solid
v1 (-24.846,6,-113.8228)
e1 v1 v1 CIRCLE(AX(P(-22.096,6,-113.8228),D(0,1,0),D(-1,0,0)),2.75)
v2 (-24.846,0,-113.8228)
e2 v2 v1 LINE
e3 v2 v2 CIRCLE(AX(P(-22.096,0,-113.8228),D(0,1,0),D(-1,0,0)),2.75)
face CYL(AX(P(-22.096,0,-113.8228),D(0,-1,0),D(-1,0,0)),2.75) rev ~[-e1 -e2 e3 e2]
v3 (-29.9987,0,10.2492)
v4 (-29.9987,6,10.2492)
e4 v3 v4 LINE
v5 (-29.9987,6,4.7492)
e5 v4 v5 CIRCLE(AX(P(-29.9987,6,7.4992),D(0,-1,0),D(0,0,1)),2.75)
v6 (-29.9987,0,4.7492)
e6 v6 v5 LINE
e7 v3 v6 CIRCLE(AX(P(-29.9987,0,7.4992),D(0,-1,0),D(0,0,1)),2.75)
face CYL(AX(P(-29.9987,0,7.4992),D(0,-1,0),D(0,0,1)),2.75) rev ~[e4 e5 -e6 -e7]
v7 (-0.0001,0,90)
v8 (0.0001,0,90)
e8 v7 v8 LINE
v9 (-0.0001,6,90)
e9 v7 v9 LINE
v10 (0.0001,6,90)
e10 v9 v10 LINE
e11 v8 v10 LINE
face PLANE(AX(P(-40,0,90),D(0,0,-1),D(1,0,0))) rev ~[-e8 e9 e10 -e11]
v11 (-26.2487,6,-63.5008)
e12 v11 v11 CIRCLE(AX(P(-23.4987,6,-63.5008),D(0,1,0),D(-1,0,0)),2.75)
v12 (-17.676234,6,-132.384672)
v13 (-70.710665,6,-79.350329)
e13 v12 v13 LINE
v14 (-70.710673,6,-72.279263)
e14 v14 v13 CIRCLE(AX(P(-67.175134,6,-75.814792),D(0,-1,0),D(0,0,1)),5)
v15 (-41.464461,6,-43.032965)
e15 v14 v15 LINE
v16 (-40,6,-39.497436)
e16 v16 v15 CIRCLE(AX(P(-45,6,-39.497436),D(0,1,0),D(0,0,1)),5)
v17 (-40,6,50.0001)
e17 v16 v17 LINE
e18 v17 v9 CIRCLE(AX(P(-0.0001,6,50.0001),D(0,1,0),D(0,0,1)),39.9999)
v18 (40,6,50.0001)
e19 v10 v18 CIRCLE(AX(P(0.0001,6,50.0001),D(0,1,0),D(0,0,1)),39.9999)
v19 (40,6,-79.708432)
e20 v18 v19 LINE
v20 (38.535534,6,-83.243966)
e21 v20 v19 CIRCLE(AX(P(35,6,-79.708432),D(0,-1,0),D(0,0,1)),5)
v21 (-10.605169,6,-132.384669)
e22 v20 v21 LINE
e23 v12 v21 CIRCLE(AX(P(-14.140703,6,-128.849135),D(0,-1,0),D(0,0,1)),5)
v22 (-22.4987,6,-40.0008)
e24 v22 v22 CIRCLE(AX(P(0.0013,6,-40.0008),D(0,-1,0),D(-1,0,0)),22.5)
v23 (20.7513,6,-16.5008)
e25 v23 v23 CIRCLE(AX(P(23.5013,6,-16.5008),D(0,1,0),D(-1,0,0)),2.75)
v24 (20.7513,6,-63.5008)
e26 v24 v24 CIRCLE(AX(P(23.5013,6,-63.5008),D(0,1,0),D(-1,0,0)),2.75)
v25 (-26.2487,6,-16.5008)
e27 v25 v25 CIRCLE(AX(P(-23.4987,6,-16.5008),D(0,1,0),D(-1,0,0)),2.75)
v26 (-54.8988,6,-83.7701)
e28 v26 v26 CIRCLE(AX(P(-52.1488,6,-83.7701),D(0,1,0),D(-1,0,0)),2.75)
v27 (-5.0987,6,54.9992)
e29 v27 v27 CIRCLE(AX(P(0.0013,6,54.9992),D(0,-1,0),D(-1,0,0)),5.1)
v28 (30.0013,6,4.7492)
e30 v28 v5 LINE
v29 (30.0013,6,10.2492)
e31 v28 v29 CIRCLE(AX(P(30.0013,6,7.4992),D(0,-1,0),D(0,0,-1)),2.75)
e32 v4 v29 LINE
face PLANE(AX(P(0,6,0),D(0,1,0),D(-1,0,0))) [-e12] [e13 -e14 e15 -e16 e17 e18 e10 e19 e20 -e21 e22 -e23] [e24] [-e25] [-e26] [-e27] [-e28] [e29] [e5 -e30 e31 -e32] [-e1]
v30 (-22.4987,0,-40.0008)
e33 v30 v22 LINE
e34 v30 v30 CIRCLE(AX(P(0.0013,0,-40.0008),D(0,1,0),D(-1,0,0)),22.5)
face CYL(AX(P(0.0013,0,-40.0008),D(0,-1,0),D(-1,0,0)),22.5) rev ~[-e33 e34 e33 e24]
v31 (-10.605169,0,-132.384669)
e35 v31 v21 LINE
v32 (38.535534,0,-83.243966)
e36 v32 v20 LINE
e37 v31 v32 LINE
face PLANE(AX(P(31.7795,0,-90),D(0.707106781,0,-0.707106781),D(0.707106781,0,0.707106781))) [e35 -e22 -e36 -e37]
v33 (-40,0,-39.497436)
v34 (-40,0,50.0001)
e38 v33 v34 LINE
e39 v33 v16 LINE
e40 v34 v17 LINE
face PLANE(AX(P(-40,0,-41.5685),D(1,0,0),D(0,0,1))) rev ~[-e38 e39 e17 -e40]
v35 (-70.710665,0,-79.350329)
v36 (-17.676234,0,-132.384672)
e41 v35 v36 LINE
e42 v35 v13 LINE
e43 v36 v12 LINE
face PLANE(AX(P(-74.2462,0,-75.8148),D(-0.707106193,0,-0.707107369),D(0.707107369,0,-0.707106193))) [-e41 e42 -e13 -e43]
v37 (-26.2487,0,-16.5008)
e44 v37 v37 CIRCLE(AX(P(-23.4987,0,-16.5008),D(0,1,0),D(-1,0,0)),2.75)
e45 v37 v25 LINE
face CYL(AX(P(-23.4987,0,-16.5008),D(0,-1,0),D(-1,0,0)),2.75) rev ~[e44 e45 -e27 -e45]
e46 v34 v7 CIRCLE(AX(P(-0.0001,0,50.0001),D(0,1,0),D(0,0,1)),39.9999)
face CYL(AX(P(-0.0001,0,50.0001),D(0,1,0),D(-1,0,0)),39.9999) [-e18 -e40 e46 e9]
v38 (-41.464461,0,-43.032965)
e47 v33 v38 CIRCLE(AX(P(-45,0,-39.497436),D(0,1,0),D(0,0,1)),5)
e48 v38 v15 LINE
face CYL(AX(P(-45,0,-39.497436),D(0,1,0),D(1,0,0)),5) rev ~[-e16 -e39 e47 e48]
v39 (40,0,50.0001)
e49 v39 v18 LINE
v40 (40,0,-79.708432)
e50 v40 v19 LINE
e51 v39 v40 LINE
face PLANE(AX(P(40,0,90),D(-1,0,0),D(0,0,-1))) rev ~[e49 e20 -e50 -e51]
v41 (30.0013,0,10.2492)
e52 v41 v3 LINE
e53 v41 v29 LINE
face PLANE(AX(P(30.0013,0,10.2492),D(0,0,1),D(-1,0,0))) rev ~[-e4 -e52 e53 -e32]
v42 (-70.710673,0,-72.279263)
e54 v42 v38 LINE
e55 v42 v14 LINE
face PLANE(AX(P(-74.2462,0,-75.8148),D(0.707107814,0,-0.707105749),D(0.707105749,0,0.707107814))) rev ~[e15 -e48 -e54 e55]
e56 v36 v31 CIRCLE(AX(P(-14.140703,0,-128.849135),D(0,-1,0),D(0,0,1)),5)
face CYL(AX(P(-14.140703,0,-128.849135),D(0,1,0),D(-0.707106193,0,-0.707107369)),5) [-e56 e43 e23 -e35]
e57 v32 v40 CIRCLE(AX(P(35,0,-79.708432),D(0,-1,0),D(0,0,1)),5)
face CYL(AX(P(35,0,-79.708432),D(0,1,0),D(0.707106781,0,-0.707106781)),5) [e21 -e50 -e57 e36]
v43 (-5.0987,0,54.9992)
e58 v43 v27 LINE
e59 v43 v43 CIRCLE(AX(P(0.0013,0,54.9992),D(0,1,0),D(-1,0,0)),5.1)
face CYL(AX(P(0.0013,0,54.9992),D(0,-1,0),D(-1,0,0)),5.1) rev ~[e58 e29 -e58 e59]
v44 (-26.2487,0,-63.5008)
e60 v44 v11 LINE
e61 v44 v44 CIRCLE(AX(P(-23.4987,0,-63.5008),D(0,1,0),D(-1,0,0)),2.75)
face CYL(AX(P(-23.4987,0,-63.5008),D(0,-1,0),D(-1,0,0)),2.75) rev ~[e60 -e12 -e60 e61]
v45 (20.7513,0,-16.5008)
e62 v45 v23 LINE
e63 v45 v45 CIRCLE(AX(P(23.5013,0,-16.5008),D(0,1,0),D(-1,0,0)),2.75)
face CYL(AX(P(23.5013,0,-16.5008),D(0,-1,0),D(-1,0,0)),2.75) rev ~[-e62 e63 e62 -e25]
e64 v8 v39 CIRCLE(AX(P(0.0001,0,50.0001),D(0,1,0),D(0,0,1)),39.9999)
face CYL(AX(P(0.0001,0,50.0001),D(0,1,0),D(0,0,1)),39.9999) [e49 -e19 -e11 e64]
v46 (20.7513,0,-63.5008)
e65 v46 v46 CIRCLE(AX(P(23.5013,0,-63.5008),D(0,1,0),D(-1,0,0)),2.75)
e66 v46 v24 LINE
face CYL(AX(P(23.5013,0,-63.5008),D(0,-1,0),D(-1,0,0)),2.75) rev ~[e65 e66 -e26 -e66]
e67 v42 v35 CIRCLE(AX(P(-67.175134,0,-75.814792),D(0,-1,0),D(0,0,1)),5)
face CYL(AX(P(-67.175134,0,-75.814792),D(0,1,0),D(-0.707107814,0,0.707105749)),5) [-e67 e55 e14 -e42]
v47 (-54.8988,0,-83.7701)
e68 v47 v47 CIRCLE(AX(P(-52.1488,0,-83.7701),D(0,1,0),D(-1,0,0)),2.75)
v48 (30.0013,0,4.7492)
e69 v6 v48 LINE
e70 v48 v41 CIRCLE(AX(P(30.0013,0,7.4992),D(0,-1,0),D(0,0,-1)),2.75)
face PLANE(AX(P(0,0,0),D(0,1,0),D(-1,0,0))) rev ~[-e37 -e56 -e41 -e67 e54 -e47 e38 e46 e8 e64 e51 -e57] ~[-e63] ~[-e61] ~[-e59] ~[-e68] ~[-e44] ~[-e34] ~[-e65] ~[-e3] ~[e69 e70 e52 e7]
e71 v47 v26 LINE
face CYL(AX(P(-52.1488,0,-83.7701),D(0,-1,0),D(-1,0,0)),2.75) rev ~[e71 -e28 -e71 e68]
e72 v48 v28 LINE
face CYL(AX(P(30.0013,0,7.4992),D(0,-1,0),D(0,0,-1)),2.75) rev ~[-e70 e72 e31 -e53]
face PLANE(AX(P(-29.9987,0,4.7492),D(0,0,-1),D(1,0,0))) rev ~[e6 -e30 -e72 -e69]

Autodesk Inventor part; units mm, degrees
ref_plane "YZ Plane" through (0, 0, 0) normal (1, 0, 0) x (0, 1, 0)
ref_plane "XZ Plane" through (0, 0, 0) normal (0, 1, 0) x (-1, 0, 0)
sketch "Sketch1" plane through (0, 0, 0) normal (0, 1, 0) x (-1, 0, 0)
  line L0 (40, 90) -> (-40, 90)
  line L1 (-40, 90) -> (-40, -81.7795)
  line L2 (40, -41.5685) -> (40, 90)
  line L3 (40, 90) -> (-40, -90) construction
  line L4 (-40, 90) -> (40, -90) construction
  circle A0 centre (-0.0013, 54.9992) radius 5.1
  line L5 (23.4987, -16.5008) -> (-23.5013, -16.5008) construction
  line L6 (-23.5013, -16.5008) -> (-23.5013, -63.5008) construction
  line L7 (-23.5013, -63.5008) -> (23.4987, -63.5008) construction
  line L8 (23.4987, -63.5008) -> (23.4987, -16.5008) construction
  line L9 (23.4987, -16.5008) -> (-23.5013, -63.5008) construction
  line L10 (-23.5013, -16.5008) -> (23.4987, -63.5008) construction
  circle A1 centre (23.4987, -16.5008) radius 2.75
  circle A2 centre (23.4987, -63.5008) radius 2.75
  circle A3 centre (-23.5013, -16.5008) radius 2.75
  circle A4 centre (-23.5013, -63.5008) radius 2.75
  line L11 (-0.0013, -90.0008) -> (-0.0013, -80) construction
  line L12 (19.9987, -11.0008) -> (-20.0013, -11.0008) construction
  line L13 (-20.0013, -11.0008) -> (-20.0013, -69.0008) construction
  line L14 (-20.0013, -69.0008) -> (19.9987, -69.0008) construction
  line L15 (19.9987, -69.0008) -> (19.9987, -11.0008) construction
  line L16 (19.9987, -11.0008) -> (-20.0013, -69.0008) construction
  line L17 (-20.0013, -11.0008) -> (19.9987, -69.0008) construction
  line L18 (-29.0013, -60.0008) -> (28.9987, -60.0008) construction
  line L19 (28.9987, -60.0008) -> (28.9987, -20.0008) construction
  line L20 (28.9987, -20.0008) -> (-29.0013, -20.0008) construction
  line L21 (-29.0013, -20.0008) -> (-29.0013, -60.0008)
  line L22 (-29.0013, -60.0008) -> (28.9987, -20.0008) construction
  line L23 (28.9987, -60.0008) -> (-29.0013, -20.0008) construction
  line L24 (-0.0013, 54.9992) -> (102.5291, -47.5313) construction
  line L25 (-0.0013, 54.9992) -> (144.9987, 54.9992) construction
  line L26 (28.2843, 83.2843) -> (-28.2843, 26.7157) construction
  line L27 (-28.2843, 26.7157) -> (74.2462, -75.8148) construction
  line L28 (74.2462, -75.8148) -> (130.8148, -19.2462) construction
  line L29 (130.8148, -19.2462) -> (28.2843, 83.2843) construction
  line L30 (28.2843, 83.2843) -> (74.2462, -75.8148) construction
  line L31 (-28.2843, 26.7157) -> (130.8148, -19.2462) construction
  line L32 (74.2462, -75.8148) -> (14.1407, -135.9202)
  line L33 (14.1407, -135.9202) -> (-0.0014, -121.7781)
  line L34 (-0.0014, -121.7781) -> (-31.7795, -90)
  line L35 (74.2462, -75.8148) -> (40, -41.5685)
  line L36 (-31.7795, -90) -> (-40, -81.7795)
  line L37 (44.1935, -105.8675) -> (37.1224, -98.7964)
  line L38 (37.1224, -98.7964) -> (52.1488, -83.7701) construction
  line L39 (37.1224, -98.7964) -> (22.096, -113.8228) construction
  circle A5 centre (52.1488, -83.7701) radius 2.75
  circle A6 centre (22.096, -113.8228) radius 2.75
  line L40 (-0.0013, 54.9992) -> (-0.0013, -40.0008)
  circle A7 centre (-0.0013, -40.0008) radius 22.5
  point P0 (0, 0)
  point P1 (51.2639, 3.7339)
  dimension "d0" = 80
  dimension "d1" = 180
  dimension "d3" = 10.2
  dimension "d5" = 47
  dimension "d6" = 47
  dimension "d7" = 5.5
  dimension "d8" = 5.5
  dimension "d9" = 5.5
  dimension "d10" = 5.5
  dimension "d12" = 40
  dimension "d13" = 58
  dimension "d14" = 58
  dimension "d15" = 40
  dimension "d27" = 45
  dimension "d28" = 145
  dimension "d29" = 80
  dimension "d30" = 145
  dimension "d31" = 85.002
  dimension "d32" = 20
  dimension "d33" = 10
  dimension "d35" = 21.2505
  dimension "d36" = 21.2505
  dimension "d37" = 5.5
  dimension "d38" = 5.5
  dimension "d53" = 95
  dimension "d54" = 45
extrude "Plate3" add sketch "Sketch1" along normal blind 6
fillet "Fillet6" radius 5 4 edges at (-40, 3, -41.5685) (-74.2462, 3, -75.8148) (-14.1407, 3, -135.9202) (40, 3, -81.7795)
fillet "Fillet7" radius 40 2 edges at (40, 3, 90) (-40, 3, 90)
sketch "Sketch2" plane through (0, 0, 0) normal (0, -1, 0) x (1, 0, 0)
  circle A0 centre (0.0013, 54.9992) radius 5.1 projected
  line L0 (0.0013, 54.9992) -> (0.0013, -40.0008) construction
  line L1 (0.0013, 7.4992) -> (55.0013, 7.4992) construction
  line L2 (0.0013, 7.4992) -> (-54.9987, 7.4992) construction
  line L3 (-29.9987, 7.4992) -> (30.0013, 7.4992) construction
  line L4 (-29.9987, 4.7492) -> (30.0013, 4.7492)
  line L5 (30.0013, 10.2492) -> (-29.9987, 10.2492)
  arc A1 (-29.9987, 10.2492) -> (-29.9987, 4.7492) centre (-29.9987, 7.4992) ccw
  arc A2 (30.0013, 4.7492) -> (30.0013, 10.2492) centre (30.0013, 7.4992) ccw
  point P0 (0, 0)
  dimension "d43" = 95
  dimension "d44" = 55
  dimension "d45" = 55
  dimension "d46" = 30
  dimension "d47" = 5.5
extrude "Extrusion1" cut sketch "Sketch2" against normal blind 10 contours A1 L5 A2 L4
ref_plane "Work Plane2" through (30.0013, 0, 7.4992) normal (0, 0, -1) x (-1, 0, 0)
equation "\"d39\" = Thickness"
equation "\"BendRadius\" = Thickness"
equation "\"BendReliefWidth\" = Thickness"
equation "\"BendReliefDepth\" = 0.5 * Thickness"
equation "\"CornerReliefSize\" = 4 * Thickness"
equation "\"MinimumRemnant\" = 2 * Thickness"
equation "\"TransitionRadius\" = BendRadius"
equation "\"JacobiRadiusSize\" = BendRadius"
equation "\"GapSize\" = Thickness"
equation "\"Thickness\" = 6"
properties part number "NEMA23MountPlatev2" material "Aluminum 6061"
